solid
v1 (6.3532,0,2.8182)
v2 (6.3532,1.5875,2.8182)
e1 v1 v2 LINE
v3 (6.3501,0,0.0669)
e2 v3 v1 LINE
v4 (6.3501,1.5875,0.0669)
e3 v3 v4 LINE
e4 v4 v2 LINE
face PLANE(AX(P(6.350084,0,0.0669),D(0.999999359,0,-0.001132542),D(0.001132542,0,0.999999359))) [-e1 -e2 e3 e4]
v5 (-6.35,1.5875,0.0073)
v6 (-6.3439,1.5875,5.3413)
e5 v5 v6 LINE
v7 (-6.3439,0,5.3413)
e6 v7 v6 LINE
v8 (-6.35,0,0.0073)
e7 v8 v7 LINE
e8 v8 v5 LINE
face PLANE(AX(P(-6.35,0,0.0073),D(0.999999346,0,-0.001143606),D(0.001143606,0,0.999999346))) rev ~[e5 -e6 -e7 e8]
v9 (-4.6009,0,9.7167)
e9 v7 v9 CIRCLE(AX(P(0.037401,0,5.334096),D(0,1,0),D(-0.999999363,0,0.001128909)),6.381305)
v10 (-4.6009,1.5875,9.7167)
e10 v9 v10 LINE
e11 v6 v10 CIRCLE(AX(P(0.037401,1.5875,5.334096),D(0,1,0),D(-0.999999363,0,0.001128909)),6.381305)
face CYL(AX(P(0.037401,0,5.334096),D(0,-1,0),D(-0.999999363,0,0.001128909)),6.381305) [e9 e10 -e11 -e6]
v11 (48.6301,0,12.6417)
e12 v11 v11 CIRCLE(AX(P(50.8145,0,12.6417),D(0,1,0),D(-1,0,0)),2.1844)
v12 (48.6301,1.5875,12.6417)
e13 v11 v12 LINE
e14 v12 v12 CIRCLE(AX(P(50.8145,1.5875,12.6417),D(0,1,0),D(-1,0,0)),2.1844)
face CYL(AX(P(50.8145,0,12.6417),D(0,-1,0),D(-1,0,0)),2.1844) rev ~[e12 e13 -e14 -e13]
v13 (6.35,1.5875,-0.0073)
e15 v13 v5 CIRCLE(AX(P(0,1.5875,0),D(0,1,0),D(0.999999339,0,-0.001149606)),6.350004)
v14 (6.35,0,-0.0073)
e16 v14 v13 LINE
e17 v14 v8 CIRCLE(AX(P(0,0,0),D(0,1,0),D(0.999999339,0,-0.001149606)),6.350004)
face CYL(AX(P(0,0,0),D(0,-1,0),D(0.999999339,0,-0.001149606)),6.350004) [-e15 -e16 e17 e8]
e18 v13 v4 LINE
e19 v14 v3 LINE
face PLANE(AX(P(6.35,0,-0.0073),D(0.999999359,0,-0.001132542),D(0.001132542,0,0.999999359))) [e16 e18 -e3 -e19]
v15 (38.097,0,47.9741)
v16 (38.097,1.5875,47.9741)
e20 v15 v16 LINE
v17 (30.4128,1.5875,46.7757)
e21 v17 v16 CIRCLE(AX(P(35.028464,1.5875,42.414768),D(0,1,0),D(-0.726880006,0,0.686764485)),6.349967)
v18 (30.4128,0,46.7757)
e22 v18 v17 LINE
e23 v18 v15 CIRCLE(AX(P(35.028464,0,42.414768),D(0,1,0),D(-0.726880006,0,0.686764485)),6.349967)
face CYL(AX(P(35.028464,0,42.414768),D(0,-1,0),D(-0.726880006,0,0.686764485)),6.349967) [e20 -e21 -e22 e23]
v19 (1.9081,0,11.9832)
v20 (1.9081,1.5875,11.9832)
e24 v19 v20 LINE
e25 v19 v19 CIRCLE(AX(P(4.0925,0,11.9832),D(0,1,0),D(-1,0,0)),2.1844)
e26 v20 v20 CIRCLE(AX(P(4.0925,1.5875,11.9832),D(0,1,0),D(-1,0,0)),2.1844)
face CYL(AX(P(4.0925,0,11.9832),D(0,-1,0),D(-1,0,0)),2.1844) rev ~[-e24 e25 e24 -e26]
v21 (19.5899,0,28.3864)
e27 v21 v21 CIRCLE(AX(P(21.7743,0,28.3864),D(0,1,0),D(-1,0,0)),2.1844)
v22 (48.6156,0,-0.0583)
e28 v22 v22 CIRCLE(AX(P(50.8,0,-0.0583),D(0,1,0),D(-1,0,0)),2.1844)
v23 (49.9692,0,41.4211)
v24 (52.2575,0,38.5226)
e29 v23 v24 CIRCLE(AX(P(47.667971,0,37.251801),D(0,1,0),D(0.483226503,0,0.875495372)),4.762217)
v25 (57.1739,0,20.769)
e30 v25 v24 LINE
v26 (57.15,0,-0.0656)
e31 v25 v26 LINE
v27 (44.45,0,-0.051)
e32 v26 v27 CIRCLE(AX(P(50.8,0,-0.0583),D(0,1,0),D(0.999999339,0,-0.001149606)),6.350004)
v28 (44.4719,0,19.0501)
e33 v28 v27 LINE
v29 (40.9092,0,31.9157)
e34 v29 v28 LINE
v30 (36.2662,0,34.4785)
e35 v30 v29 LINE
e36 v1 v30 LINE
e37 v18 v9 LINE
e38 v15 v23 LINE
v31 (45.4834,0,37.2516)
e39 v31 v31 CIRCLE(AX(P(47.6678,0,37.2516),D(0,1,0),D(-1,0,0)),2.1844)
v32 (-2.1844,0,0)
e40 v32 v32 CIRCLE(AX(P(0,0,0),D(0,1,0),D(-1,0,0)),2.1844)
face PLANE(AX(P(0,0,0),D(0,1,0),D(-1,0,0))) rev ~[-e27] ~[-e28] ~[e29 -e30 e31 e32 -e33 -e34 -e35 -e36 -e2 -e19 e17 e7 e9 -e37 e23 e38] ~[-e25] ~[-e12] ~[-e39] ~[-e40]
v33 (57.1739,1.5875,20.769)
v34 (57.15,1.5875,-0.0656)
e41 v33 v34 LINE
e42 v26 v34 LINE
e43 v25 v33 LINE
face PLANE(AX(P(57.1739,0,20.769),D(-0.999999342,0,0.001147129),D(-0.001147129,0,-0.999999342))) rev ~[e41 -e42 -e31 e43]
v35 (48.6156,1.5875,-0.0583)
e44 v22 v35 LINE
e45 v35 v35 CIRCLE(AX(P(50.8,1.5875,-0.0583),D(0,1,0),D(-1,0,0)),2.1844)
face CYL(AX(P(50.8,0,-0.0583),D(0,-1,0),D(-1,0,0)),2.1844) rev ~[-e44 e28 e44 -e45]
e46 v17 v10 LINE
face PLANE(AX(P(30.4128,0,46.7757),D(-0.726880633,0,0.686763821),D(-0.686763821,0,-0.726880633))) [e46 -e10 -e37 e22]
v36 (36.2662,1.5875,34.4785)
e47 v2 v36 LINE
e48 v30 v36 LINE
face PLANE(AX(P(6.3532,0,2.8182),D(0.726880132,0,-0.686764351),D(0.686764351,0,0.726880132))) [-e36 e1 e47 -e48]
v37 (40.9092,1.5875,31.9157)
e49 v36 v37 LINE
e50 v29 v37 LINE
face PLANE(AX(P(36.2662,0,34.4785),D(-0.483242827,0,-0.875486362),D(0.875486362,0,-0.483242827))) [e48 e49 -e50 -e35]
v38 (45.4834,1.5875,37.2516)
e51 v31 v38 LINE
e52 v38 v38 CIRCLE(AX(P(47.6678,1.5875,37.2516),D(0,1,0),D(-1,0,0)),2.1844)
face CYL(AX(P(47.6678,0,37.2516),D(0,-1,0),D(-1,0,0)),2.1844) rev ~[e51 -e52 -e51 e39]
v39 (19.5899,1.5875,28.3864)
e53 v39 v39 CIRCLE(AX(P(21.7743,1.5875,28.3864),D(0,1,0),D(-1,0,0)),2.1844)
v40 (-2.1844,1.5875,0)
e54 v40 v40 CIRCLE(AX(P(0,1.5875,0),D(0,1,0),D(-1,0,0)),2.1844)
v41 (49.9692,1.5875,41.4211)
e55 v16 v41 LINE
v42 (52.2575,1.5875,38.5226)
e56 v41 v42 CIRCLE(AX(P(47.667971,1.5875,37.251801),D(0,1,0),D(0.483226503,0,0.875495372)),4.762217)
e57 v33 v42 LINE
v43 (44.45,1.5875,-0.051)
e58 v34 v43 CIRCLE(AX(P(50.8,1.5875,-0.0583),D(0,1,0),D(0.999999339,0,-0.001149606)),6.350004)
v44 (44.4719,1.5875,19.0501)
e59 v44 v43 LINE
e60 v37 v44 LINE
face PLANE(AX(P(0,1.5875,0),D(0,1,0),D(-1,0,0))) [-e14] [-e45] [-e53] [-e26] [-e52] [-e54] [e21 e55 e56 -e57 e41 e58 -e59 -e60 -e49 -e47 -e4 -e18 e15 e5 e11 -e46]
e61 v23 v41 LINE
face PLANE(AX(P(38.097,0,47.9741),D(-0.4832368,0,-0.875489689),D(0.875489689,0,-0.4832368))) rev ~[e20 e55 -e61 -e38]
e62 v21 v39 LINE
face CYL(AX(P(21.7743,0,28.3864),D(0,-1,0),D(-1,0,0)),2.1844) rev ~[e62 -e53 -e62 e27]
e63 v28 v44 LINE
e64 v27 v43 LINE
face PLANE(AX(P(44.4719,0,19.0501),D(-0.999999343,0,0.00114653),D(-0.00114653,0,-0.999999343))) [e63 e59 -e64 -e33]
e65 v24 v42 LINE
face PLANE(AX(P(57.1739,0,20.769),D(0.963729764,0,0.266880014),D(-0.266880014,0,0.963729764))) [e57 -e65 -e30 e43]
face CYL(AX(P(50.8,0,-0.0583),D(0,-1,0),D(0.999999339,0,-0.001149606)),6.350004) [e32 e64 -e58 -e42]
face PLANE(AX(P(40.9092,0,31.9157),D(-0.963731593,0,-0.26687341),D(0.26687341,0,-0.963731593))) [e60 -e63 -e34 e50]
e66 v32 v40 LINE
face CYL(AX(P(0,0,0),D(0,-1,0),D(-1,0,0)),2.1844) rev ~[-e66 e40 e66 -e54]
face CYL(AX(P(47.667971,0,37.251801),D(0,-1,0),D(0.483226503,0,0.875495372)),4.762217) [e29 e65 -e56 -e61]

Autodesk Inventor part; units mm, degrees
ref_plane "YZ Plane" through (0, 0, 0) normal (1, 0, 0) x (0, 1, 0)
ref_plane "XZ Plane" through (0, 0, 0) normal (0, 1, 0) x (-1, 0, 0)
ref_plane "XY Plane" through (0, 0, 0) normal (0, 0, 1) x (1, 0, 0)
sketch "main" plane through (0, 0, 0) normal (0, 0, 1) x (1, 0, 0)
  circle A0 centre (13.3958, 31.4064) radius 2.1844
  line L0 (25.3837, 29.1351) -> (22.5582, 29.1351)
  line L1 (25.3837, 29.1351) -> (25.3095, 29.1351)
  line L2 (20.0497, 41.8351) -> (13.668, 35.4534) construction
  arc A1 (20.0497, 41.8351) -> (15.6723, 40.0972) centre (20.0497, 35.4534) ccw
  circle A2 centre (25.3837, 35.4851) radius 2.1844
  line L3 (25.3837, 41.8351) -> (20.0497, 41.8351)
  line L4 (20.0497, 41.8351) -> (29.0749, 41.8351) construction
  arc A3 (25.3837, 29.1351) -> (25.3837, 41.8351) centre (25.3837, 35.4851) ccw
  circle A4 centre (12.6837, -15.3149) radius 2.1844
  circle A5 centre (-11.9225, -12.1399) radius 2.1844
  arc A6 (-16.0947, -14.4365) -> (-13.1988, -16.7282) centre (-11.9225, -12.1399) ccw
  line L5 (-9.1363, -0.7415) -> (-6.5789, -5.3874)
  line L6 (-22.634, -2.5568) -> (-16.0947, -14.4365)
  line L7 (-6.5789, -5.3874) -> (6.2826, -8.9649)
  line L8 (6.2826, -8.9649) -> (25.3837, -8.9649)
  circle A7 centre (25.3837, -15.3149) radius 2.1844
  arc A8 (25.3837, -21.6649) -> (25.3837, -8.9649) centre (25.3837, -15.3149) ccw
  line L9 (4.5492, -21.6649) -> (25.3837, -21.6649)
  line L10 (4.5492, -21.6649) -> (-13.1988, -16.7282)
  line L11 (22.5582, 29.1351) -> (-9.1363, -0.7415)
  line L12 (-21.4268, 5.126) -> (15.6723, 40.0972)
  circle A9 centre (-3.0276, 13.7434) radius 2.1844
  arc A10 (-21.4268, 5.126) -> (-22.634, -2.5568) centre (-17.0712, 0.5054) ccw
  point P0 (7.4272, 10.3782)
  point P1 (19.0337, 40.8191)
  point P2 (-25.006, 1.7522)
  point P3 (-30.1788, -11.3461)
  dimension "d0" = 4.3688
  dimension "d1" = 135
  dimension "d2" = 12.7
  dimension "d3" = 6.35
  dimension "d4" = 12.7
  dimension "d5" = 4.3688
  dimension "d6" = 4.3688
  dimension "d9" = 4.7625
  dimension "d10" = 47.625
  dimension "d11" = 37.3062
sketch "Sketch1" plane through (0, 0, 0) normal (0, 1, 0) x (-1, 0, 0)
  circle A0 centre (-4.0925, 11.9832) radius 2.1844
  line L0 (-6.35, -0.0073) -> (-6.3532, 2.8182)
  line L1 (-6.35, -0.0073) -> (-6.3501, 0.0669)
  line L2 (6.3439, 5.3413) -> (-0.0452, 11.7157) construction
  arc A1 (6.3439, 5.3413) -> (4.6009, 9.7167) centre (-0.0379, 5.334) ccw
  circle A2 centre (0, 0) radius 2.1844
  line L3 (6.35, 0.0073) -> (6.3439, 5.3413)
  line L4 (6.3439, 5.3413) -> (6.3542, -3.6839) construction
  arc A3 (-6.35, -0.0073) -> (6.35, 0.0073) centre (0, 0) ccw
  circle A4 centre (-50.8145, 12.6417) radius 2.1844
  circle A5 centre (-47.6678, 37.2516) radius 2.1844
  arc A6 (-49.9692, 41.4211) -> (-52.2575, 38.5226) centre (-47.6678, 37.2516) ccw
  line L5 (-36.2662, 34.4785) -> (-40.9092, 31.9157)
  line L6 (-38.097, 47.9741) -> (-49.9692, 41.4211)
  line L7 (-40.9092, 31.9157) -> (-44.4719, 19.0501)
  line L8 (-44.4719, 19.0501) -> (-44.45, -0.051)
  circle A7 centre (-50.8, -0.0583) radius 2.1844
  arc A8 (-57.15, -0.0656) -> (-44.45, -0.051) centre (-50.8, -0.0583) ccw
  line L9 (-57.1739, 20.769) -> (-57.15, -0.0656)
  line L10 (-57.1739, 20.769) -> (-52.2575, 38.5226)
  line L11 (-6.3532, 2.8182) -> (-36.2662, 34.4785)
  line L12 (-30.4128, 46.7757) -> (4.6009, 9.7167)
  circle A9 centre (-21.7743, 28.3864) radius 2.1844
  arc A10 (-30.4128, 46.7757) -> (-38.097, 47.9741) centre (-35.0285, 42.4147) ccw
  point P0 (0, 0)
  point P1 (-6.3501, 0.0669)
extrude "Extrusion1" add sketch "Sketch1" along normal blind 1.5875
properties part number "Ring Funnel" material "Acetal Resin, White"
